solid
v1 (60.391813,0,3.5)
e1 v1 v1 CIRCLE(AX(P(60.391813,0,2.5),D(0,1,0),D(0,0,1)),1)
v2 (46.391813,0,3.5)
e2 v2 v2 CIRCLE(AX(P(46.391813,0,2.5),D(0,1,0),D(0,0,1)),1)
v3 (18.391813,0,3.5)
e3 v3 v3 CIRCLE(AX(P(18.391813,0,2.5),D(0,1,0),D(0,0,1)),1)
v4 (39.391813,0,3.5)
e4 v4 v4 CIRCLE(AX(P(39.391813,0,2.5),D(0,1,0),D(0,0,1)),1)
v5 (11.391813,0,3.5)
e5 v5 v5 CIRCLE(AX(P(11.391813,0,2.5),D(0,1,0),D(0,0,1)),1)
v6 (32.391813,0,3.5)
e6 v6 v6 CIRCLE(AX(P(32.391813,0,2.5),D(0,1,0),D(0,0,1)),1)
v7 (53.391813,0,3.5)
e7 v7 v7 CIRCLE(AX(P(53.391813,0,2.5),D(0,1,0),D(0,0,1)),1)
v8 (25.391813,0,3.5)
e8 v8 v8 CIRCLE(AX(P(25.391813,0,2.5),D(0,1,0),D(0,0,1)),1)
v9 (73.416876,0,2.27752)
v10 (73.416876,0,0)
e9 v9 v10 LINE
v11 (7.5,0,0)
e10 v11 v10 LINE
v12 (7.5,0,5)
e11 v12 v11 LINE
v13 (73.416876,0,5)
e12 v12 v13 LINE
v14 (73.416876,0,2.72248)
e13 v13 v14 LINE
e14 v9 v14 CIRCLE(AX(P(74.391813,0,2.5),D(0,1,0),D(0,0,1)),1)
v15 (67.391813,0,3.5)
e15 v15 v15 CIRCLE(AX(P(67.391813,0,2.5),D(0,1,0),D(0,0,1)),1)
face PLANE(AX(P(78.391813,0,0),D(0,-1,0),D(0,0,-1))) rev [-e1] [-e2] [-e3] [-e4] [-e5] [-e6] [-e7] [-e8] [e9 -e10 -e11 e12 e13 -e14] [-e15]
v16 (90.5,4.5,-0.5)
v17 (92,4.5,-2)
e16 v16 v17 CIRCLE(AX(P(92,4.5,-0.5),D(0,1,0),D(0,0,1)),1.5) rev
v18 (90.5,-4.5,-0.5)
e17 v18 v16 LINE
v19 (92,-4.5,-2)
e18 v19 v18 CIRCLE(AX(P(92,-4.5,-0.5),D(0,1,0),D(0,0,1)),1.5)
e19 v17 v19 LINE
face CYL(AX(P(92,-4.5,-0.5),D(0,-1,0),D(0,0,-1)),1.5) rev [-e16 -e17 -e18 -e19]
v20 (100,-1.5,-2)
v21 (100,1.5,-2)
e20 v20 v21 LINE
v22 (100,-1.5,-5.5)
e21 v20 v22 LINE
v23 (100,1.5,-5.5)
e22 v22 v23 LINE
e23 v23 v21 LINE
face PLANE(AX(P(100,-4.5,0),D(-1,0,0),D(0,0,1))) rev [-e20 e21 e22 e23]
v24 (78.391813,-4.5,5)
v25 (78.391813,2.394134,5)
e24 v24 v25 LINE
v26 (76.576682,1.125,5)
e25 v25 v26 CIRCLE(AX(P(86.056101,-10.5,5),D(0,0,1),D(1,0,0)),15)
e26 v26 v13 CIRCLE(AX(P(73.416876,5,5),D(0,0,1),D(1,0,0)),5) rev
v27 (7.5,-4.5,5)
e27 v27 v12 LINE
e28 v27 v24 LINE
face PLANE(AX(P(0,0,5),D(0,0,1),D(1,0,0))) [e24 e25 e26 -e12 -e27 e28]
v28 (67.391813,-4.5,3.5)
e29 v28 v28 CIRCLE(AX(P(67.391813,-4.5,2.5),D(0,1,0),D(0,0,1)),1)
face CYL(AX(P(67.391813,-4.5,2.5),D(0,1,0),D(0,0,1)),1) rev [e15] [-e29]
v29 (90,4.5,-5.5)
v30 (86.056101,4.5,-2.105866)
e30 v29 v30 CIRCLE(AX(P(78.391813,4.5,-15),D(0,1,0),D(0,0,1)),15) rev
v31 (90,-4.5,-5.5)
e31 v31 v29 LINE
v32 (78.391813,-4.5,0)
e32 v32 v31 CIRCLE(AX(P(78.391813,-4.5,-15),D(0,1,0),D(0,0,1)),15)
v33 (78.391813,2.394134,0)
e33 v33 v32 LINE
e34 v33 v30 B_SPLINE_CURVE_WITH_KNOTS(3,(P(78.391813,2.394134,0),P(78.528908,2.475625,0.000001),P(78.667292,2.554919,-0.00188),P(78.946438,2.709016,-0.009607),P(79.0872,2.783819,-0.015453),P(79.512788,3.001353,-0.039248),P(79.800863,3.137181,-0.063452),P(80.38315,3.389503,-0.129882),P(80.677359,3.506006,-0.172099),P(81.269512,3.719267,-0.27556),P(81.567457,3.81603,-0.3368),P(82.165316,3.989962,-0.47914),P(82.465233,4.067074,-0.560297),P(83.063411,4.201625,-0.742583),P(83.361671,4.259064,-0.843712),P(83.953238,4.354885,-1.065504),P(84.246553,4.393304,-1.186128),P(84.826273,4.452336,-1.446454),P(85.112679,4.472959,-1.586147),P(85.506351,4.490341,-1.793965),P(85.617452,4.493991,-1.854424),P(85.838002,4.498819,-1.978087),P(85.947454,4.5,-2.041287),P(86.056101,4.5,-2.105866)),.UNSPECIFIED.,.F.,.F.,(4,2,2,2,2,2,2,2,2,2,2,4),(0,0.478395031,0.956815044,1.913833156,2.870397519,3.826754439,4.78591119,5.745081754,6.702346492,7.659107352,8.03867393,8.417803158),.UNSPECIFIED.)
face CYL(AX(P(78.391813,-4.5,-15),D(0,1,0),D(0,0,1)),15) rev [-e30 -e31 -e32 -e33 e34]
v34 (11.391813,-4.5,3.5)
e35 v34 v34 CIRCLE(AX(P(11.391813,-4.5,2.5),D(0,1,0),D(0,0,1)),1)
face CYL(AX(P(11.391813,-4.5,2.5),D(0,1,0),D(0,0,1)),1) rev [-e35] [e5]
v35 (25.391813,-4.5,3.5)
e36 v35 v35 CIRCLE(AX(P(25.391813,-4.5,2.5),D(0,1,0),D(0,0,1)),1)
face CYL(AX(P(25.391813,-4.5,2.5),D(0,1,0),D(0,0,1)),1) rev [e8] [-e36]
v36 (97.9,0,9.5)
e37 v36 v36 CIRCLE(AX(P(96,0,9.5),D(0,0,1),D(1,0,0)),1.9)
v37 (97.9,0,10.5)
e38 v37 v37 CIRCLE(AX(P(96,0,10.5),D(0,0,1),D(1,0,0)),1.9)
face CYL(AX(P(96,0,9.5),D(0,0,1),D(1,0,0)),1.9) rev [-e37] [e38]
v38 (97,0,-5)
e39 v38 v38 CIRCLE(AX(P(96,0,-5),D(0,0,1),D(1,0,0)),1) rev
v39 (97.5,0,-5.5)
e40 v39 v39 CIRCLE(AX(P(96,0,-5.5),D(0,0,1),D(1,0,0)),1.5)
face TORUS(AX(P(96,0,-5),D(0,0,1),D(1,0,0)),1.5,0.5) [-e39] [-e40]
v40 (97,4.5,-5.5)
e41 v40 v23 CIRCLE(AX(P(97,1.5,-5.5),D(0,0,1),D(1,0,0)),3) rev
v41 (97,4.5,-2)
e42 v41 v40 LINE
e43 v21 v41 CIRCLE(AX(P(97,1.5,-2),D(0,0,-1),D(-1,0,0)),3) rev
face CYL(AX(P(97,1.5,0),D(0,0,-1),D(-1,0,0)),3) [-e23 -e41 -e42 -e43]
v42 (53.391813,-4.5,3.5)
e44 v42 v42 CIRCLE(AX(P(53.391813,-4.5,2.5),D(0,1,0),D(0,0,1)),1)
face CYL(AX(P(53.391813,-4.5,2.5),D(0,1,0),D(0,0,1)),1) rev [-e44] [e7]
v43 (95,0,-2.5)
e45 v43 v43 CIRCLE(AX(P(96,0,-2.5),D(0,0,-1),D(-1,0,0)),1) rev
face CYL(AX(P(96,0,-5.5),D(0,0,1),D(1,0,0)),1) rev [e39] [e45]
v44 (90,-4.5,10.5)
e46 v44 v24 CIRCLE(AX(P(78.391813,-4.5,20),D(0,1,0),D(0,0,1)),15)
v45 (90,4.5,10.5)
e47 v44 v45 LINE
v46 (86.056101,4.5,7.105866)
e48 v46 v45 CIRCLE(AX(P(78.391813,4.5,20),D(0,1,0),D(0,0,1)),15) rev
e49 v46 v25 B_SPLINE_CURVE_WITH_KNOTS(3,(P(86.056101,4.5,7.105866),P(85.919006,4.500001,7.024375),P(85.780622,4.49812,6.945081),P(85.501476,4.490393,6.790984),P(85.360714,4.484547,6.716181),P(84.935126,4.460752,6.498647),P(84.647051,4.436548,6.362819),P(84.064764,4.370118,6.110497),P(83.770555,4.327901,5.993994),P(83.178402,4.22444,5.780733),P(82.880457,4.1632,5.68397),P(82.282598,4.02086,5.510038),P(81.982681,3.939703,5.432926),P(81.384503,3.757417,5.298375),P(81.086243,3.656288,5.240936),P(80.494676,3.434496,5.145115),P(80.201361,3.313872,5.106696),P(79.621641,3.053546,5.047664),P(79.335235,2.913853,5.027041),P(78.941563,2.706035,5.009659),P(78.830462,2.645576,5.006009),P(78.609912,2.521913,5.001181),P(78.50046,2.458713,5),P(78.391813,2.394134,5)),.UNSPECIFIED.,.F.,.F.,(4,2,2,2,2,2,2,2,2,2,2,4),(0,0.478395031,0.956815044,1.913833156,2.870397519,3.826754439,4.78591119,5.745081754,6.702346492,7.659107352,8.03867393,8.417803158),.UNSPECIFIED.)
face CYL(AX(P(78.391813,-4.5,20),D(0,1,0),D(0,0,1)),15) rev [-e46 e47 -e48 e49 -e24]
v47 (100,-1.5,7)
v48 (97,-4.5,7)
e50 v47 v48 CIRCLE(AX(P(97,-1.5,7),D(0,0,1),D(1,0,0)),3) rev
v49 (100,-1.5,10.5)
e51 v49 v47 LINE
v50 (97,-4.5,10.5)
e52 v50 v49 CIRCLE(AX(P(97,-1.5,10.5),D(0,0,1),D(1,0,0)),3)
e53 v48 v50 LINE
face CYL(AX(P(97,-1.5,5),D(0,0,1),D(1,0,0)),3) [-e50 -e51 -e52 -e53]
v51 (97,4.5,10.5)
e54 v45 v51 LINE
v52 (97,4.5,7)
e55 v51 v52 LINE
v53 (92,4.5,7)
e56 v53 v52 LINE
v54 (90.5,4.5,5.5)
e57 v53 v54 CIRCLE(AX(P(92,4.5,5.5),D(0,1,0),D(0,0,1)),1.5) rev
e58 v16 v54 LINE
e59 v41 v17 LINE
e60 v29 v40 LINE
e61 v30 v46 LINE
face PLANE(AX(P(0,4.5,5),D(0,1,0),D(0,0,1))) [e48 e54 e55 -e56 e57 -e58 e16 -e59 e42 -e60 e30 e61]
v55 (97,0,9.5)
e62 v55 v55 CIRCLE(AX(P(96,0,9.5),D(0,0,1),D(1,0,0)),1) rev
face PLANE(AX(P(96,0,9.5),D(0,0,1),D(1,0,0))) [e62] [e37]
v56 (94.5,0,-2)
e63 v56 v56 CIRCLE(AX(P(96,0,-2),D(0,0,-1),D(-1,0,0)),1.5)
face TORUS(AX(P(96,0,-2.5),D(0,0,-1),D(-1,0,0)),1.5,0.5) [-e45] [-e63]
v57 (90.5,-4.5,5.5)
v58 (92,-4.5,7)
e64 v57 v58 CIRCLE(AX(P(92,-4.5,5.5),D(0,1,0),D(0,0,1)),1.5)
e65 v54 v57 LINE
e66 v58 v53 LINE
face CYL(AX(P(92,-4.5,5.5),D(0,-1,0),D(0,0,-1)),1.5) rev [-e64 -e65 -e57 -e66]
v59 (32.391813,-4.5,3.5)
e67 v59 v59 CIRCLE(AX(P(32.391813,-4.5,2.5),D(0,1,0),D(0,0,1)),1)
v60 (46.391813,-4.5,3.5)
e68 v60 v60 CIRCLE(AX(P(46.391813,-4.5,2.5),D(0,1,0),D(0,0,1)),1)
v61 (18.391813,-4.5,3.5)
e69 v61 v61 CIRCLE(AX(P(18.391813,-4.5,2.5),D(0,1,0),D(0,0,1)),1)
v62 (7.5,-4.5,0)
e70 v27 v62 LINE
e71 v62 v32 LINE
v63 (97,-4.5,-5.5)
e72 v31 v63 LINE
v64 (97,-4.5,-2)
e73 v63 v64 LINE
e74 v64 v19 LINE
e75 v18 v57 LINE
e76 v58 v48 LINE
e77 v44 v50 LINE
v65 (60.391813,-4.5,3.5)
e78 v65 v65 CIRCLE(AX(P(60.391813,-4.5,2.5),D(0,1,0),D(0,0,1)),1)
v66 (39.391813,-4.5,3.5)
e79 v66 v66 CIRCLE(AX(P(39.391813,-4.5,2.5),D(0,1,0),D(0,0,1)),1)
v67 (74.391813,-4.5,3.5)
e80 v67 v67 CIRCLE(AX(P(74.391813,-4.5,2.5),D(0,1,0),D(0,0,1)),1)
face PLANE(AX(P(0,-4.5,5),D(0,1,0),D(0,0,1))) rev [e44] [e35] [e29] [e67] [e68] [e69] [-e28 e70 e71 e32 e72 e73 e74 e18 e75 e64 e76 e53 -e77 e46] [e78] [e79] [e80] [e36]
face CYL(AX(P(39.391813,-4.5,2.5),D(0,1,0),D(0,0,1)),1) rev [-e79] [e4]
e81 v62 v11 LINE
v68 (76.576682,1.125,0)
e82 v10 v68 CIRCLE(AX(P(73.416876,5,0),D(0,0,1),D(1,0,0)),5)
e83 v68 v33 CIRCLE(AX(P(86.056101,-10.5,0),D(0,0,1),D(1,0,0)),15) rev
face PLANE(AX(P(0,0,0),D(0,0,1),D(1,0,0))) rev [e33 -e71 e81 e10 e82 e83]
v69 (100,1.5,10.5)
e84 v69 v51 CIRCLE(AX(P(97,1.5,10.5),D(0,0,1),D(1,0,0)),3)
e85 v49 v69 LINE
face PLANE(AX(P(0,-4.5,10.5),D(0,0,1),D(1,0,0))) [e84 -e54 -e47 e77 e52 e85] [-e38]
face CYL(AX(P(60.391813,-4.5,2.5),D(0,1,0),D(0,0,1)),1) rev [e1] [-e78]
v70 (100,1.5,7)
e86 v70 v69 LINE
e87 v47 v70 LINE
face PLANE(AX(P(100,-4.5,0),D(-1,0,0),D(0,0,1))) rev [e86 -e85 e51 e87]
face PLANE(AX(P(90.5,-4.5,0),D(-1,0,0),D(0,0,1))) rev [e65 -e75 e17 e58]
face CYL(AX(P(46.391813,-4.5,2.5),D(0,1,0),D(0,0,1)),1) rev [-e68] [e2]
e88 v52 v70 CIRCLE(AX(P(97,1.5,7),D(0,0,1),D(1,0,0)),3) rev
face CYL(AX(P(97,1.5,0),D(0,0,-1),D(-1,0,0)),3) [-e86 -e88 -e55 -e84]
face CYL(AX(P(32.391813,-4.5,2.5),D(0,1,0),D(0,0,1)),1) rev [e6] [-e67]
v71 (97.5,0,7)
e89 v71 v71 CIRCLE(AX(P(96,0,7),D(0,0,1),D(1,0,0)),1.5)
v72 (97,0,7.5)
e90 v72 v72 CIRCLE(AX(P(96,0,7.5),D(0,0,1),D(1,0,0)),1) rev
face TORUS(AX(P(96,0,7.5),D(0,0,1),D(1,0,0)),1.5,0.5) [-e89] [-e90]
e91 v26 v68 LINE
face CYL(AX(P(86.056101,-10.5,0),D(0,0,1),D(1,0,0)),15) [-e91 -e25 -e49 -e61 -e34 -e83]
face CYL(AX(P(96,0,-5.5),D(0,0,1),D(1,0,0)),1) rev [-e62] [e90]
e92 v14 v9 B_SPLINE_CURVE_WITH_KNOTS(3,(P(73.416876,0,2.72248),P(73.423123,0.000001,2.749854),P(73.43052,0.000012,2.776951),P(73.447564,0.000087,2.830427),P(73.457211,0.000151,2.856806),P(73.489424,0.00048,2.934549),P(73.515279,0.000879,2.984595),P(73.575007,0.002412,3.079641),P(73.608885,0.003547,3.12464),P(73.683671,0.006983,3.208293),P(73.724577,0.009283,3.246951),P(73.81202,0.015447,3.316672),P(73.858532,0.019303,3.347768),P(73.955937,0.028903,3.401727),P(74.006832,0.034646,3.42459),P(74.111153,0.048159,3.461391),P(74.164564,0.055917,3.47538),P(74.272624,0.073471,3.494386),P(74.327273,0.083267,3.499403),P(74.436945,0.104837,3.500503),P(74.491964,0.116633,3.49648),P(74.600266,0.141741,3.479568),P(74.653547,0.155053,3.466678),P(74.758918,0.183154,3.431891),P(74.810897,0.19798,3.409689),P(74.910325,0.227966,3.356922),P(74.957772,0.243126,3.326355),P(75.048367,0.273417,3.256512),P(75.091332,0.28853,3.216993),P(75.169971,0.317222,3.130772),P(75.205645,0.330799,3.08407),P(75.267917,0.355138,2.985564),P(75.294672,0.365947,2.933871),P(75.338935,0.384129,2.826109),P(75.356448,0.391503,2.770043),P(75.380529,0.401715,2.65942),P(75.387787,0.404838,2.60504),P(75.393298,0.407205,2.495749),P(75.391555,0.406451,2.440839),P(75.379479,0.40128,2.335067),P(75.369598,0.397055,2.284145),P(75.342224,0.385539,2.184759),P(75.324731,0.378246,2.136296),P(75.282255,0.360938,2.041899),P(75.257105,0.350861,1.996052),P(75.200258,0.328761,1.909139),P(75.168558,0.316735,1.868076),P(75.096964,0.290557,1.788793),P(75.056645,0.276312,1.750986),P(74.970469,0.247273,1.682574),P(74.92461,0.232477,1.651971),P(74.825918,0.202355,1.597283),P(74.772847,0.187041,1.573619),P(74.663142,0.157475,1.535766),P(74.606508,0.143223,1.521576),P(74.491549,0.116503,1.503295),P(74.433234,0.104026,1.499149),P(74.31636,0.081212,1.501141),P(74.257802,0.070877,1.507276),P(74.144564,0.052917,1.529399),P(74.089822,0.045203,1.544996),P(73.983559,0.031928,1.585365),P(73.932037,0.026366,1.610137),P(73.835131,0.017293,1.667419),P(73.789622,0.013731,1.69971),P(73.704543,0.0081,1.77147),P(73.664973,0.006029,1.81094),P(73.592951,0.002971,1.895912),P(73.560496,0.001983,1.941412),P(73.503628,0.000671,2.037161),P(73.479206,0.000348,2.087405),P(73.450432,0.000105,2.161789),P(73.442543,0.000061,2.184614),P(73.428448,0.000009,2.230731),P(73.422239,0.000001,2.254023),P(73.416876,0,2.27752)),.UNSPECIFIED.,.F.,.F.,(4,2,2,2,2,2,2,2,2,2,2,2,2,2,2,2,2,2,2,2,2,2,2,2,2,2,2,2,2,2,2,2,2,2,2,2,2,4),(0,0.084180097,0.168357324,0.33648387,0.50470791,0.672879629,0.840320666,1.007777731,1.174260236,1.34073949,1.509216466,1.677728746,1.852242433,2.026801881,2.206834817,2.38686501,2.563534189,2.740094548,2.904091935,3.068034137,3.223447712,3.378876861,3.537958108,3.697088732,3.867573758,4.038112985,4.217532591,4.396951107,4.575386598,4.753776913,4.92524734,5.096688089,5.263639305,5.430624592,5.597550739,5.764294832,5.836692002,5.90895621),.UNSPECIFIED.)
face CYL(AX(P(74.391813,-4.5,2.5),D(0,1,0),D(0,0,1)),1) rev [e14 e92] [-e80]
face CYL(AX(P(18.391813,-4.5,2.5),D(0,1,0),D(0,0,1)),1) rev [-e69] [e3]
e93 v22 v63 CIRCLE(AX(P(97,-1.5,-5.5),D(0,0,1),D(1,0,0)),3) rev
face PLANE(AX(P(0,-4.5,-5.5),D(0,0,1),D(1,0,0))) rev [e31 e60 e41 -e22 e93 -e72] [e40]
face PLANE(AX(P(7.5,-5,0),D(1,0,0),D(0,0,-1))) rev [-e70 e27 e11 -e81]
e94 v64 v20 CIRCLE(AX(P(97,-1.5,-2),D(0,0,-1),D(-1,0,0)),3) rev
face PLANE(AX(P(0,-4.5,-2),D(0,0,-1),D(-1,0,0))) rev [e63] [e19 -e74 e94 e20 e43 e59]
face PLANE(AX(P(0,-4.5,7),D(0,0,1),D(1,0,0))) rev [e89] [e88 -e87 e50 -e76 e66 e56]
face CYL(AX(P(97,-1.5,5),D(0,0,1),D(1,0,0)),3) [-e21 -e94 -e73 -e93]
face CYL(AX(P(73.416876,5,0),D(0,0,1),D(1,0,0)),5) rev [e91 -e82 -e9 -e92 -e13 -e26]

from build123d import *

# Parameters (mm, degrees)
SKETCH1_R           = 1.1
BOSS_EXTRUDE1_DEPTH = 5
BOSS_EXTRUDE2_DEPTH = 9
FILLET1_R           = 15
SKETCH3_R           = 1
CUT_EXTRUDE1_DEPTH  = 16
FILLET2_R           = 3
SKETCH4_R           = 1.9
CUT_EXTRUDE2_DEPTH  = 1
FILLET3_R           = 1.5
FILLET4_R           = 0.5
SKETCH5_W           = 82.891813234
SKETCH5_H           = 4.5
CUT_EXTRUDE3_DEPTH  = 5
SKETCH6_R           = 1
CUT_EXTRUDE4_DEPTH  = 4.5
LPATTERN1_COUNT     = 11
LPATTERN1_PITCH     = 7
FILLET5_R           = 5
FILLET6_R           = 15
SKETCH7_W           = 12
SKETCH7_H           = 5
CUT_EXTRUDE5_DEPTH  = 5
FILLET7_R           = 0.5


with BuildPart() as part:
    # Sketch1 → Boss-Extrude1 (new body)
    with BuildSketch(Plane.XY):
        with BuildLine():
            ThreePointArc((0, 4.5), (-4.5, 0), (0, -4.5))
            Line((0, -4.5), (90, -4.5))
            Line((90, -4.5), (90, 4.5))
            Line((90, 4.5), (0, 4.5))
        make_face()
        Circle(SKETCH1_R, mode=Mode.SUBTRACT)
    extrude(amount=BOSS_EXTRUDE1_DEPTH)

    # Sketch2 → Boss-Extrude2 (add)
    with BuildSketch(Plane(origin=(0, 4.5, 0), x_dir=(1, 0, 0), z_dir=(0, 1, 0))):
        Polygon((90.5, 2), (100, 2), (100, 5.5), (90, 5.5), (90, 0), (90, -5), (90, -10.5), (100, -10.5), (100, -7), (90.5, -7), align=None)
    extrude(amount=-BOSS_EXTRUDE2_DEPTH)

    # Fillet1
    # the kernel refuses this fillet: 15 mm, written as the material it adds along each edge
    with BuildSketch(Plane(origin=(90, -4.5, 0), x_dir=(0, 0, -1), z_dir=(0, 1, 0))) as fillet1_piece_1:
        with BuildLine():
            CenterArc((15, 11.608186766), FILLET1_R, 180, 50.703519761)
            Line((0, 11.608186766), (-0.3, 11.608186766))
            Line((-0.3, 11.608186766), (-0.3, 0))
            Line((-0.3, 0), (0, -0.3))
            ThreePointArc((0, -0.3), (2.75, -0.3), (5.31, -0.232163735))
            Line((5.31, -0.232163735), (5.5, 0))
        make_face()
    extrude(amount=9)
    with BuildSketch(Plane(origin=(90, -4.5, 5), x_dir=(0, 0, 1), z_dir=(0, 1, 0))) as fillet1_piece_2:
        with BuildLine():
            CenterArc((15, -11.608186766), FILLET1_R, 129.296480239, 50.703519761)
            Line((0, -11.608186766), (-0.3, -11.608186766))
            Line((-0.3, -11.608186766), (-0.3, 0))
            Line((-0.3, 0), (0, 0.3))
            ThreePointArc((0, 0.3), (2.75, 0.3), (5.31, 0.232163735))
            Line((5.31, 0.232163735), (5.5, 0))
        make_face()
    extrude(amount=9)

    # Sketch3 → Cut-Extrude1 (cut)
    with BuildSketch(Plane.XY.offset(10.5)):
        with Locations((96, 0)):
            Circle(SKETCH3_R)
    extrude(amount=-CUT_EXTRUDE1_DEPTH, mode=Mode.SUBTRACT)

    # Fillet2
    fillet2_edges = [part.edges().sort_by_distance(p)[0] for p in [
        (100, 4.5, 8.75),
        (100, 4.5, -3.75),
        (100, -4.5, 8.75),
        (100, -4.5, -3.75),
    ]]
    fillet(fillet2_edges, radius=FILLET2_R)

    # Sketch4 → Cut-Extrude2 (cut)
    with BuildSketch(Plane.XY.offset(10.5)):
        with Locations((96, 0)):
            Circle(SKETCH4_R)
    extrude(amount=-CUT_EXTRUDE2_DEPTH, mode=Mode.SUBTRACT)

    # Fillet3
    fillet3_edges = [part.edges().sort_by_distance(p)[0] for p in [
        (90.5, 0, 7),
        (90.5, 0, -2),
    ]]
    fillet(fillet3_edges, radius=FILLET3_R)

    # Fillet4
    fillet4_edges = [part.edges().sort_by_distance(p)[0] for p in [
        (95, 0, -2),
    ]]
    fillet(fillet4_edges, radius=FILLET4_R)

    # Sketch5 → Cut-Extrude3 (cut)
    with BuildSketch(Plane.XY.offset(5)):
        with Locations((36.945906617, 2.25)):
            Rectangle(SKETCH5_W, SKETCH5_H)
    extrude(amount=-CUT_EXTRUDE3_DEPTH, mode=Mode.SUBTRACT)

    # Sketch6 → Cut-Extrude4 (cut)
    with BuildSketch(Plane(origin=(0, 0, 0), x_dir=(1, 0, 0), z_dir=(0, 1, 0))):
        with Locations(Location((74.391813234, -2.5, 0), (0, 0, 270))):
            Circle(SKETCH6_R)
    cut_extrude4 = extrude(amount=-CUT_EXTRUDE4_DEPTH, mode=Mode.SUBTRACT)

    # LPattern1: Cut-Extrude4 ×11
    with Locations(*[(-i * LPATTERN1_PITCH, 0, 0) for i in range(1, LPATTERN1_COUNT)]):
        add(cut_extrude4, mode=Mode.SUBTRACT)

    # Fillet5
    # the kernel refuses this fillet: 5 mm, written as the material it adds along each edge
    with BuildSketch(Plane(origin=(78.391813234, 0, 5), x_dir=(0, 1, 0), z_dir=(0, 0, -1))) as fillet5_piece_1_section:
        with BuildLine():
            CenterArc((5, -4.974937186), FILLET5_R, 95.739170477, 84.260829523)
            Line((0, -4.974937186), (0, 0))
            Line((0, 0), (4.5, 0))
        make_face()
    fillet5_piece_1 = extrude(amount=5, mode=Mode.PRIVATE)
    fillet5_piece_1 = fillet5_piece_1 - Plane(origin=(74.391813234, 1.284484558, 2.5), x_dir=(0, 0, 1), z_dir=(0, 1, 0)) * Cylinder(1, 30, mode=Mode.PRIVATE)
    add(fillet5_piece_1)

    # Fillet6
    fillet6_edges = [part.edges().sort_by_distance(p)[0] for p in [
        (78.391813234, 4.5, 2.5),
    ]]
    fillet(fillet6_edges, radius=FILLET6_R)

    # Sketch7 → Cut-Extrude5 (cut)
    with BuildSketch(Plane(origin=(0, 0, 0), x_dir=(1, 0, 0), z_dir=(0, 1, 0))):
        with Locations((1.5, -2.5)):
            Rectangle(SKETCH7_W, SKETCH7_H)
    extrude(amount=-CUT_EXTRUDE5_DEPTH, mode=Mode.SUBTRACT)

    # Fillet7
    fillet7_edges = [part.edges().sort_by_distance(p)[0] for p in [
        (95, 0, 7),
        (95, 0, -5.5),
    ]]
    fillet(fillet7_edges, radius=FILLET7_R)


solid = part.part
